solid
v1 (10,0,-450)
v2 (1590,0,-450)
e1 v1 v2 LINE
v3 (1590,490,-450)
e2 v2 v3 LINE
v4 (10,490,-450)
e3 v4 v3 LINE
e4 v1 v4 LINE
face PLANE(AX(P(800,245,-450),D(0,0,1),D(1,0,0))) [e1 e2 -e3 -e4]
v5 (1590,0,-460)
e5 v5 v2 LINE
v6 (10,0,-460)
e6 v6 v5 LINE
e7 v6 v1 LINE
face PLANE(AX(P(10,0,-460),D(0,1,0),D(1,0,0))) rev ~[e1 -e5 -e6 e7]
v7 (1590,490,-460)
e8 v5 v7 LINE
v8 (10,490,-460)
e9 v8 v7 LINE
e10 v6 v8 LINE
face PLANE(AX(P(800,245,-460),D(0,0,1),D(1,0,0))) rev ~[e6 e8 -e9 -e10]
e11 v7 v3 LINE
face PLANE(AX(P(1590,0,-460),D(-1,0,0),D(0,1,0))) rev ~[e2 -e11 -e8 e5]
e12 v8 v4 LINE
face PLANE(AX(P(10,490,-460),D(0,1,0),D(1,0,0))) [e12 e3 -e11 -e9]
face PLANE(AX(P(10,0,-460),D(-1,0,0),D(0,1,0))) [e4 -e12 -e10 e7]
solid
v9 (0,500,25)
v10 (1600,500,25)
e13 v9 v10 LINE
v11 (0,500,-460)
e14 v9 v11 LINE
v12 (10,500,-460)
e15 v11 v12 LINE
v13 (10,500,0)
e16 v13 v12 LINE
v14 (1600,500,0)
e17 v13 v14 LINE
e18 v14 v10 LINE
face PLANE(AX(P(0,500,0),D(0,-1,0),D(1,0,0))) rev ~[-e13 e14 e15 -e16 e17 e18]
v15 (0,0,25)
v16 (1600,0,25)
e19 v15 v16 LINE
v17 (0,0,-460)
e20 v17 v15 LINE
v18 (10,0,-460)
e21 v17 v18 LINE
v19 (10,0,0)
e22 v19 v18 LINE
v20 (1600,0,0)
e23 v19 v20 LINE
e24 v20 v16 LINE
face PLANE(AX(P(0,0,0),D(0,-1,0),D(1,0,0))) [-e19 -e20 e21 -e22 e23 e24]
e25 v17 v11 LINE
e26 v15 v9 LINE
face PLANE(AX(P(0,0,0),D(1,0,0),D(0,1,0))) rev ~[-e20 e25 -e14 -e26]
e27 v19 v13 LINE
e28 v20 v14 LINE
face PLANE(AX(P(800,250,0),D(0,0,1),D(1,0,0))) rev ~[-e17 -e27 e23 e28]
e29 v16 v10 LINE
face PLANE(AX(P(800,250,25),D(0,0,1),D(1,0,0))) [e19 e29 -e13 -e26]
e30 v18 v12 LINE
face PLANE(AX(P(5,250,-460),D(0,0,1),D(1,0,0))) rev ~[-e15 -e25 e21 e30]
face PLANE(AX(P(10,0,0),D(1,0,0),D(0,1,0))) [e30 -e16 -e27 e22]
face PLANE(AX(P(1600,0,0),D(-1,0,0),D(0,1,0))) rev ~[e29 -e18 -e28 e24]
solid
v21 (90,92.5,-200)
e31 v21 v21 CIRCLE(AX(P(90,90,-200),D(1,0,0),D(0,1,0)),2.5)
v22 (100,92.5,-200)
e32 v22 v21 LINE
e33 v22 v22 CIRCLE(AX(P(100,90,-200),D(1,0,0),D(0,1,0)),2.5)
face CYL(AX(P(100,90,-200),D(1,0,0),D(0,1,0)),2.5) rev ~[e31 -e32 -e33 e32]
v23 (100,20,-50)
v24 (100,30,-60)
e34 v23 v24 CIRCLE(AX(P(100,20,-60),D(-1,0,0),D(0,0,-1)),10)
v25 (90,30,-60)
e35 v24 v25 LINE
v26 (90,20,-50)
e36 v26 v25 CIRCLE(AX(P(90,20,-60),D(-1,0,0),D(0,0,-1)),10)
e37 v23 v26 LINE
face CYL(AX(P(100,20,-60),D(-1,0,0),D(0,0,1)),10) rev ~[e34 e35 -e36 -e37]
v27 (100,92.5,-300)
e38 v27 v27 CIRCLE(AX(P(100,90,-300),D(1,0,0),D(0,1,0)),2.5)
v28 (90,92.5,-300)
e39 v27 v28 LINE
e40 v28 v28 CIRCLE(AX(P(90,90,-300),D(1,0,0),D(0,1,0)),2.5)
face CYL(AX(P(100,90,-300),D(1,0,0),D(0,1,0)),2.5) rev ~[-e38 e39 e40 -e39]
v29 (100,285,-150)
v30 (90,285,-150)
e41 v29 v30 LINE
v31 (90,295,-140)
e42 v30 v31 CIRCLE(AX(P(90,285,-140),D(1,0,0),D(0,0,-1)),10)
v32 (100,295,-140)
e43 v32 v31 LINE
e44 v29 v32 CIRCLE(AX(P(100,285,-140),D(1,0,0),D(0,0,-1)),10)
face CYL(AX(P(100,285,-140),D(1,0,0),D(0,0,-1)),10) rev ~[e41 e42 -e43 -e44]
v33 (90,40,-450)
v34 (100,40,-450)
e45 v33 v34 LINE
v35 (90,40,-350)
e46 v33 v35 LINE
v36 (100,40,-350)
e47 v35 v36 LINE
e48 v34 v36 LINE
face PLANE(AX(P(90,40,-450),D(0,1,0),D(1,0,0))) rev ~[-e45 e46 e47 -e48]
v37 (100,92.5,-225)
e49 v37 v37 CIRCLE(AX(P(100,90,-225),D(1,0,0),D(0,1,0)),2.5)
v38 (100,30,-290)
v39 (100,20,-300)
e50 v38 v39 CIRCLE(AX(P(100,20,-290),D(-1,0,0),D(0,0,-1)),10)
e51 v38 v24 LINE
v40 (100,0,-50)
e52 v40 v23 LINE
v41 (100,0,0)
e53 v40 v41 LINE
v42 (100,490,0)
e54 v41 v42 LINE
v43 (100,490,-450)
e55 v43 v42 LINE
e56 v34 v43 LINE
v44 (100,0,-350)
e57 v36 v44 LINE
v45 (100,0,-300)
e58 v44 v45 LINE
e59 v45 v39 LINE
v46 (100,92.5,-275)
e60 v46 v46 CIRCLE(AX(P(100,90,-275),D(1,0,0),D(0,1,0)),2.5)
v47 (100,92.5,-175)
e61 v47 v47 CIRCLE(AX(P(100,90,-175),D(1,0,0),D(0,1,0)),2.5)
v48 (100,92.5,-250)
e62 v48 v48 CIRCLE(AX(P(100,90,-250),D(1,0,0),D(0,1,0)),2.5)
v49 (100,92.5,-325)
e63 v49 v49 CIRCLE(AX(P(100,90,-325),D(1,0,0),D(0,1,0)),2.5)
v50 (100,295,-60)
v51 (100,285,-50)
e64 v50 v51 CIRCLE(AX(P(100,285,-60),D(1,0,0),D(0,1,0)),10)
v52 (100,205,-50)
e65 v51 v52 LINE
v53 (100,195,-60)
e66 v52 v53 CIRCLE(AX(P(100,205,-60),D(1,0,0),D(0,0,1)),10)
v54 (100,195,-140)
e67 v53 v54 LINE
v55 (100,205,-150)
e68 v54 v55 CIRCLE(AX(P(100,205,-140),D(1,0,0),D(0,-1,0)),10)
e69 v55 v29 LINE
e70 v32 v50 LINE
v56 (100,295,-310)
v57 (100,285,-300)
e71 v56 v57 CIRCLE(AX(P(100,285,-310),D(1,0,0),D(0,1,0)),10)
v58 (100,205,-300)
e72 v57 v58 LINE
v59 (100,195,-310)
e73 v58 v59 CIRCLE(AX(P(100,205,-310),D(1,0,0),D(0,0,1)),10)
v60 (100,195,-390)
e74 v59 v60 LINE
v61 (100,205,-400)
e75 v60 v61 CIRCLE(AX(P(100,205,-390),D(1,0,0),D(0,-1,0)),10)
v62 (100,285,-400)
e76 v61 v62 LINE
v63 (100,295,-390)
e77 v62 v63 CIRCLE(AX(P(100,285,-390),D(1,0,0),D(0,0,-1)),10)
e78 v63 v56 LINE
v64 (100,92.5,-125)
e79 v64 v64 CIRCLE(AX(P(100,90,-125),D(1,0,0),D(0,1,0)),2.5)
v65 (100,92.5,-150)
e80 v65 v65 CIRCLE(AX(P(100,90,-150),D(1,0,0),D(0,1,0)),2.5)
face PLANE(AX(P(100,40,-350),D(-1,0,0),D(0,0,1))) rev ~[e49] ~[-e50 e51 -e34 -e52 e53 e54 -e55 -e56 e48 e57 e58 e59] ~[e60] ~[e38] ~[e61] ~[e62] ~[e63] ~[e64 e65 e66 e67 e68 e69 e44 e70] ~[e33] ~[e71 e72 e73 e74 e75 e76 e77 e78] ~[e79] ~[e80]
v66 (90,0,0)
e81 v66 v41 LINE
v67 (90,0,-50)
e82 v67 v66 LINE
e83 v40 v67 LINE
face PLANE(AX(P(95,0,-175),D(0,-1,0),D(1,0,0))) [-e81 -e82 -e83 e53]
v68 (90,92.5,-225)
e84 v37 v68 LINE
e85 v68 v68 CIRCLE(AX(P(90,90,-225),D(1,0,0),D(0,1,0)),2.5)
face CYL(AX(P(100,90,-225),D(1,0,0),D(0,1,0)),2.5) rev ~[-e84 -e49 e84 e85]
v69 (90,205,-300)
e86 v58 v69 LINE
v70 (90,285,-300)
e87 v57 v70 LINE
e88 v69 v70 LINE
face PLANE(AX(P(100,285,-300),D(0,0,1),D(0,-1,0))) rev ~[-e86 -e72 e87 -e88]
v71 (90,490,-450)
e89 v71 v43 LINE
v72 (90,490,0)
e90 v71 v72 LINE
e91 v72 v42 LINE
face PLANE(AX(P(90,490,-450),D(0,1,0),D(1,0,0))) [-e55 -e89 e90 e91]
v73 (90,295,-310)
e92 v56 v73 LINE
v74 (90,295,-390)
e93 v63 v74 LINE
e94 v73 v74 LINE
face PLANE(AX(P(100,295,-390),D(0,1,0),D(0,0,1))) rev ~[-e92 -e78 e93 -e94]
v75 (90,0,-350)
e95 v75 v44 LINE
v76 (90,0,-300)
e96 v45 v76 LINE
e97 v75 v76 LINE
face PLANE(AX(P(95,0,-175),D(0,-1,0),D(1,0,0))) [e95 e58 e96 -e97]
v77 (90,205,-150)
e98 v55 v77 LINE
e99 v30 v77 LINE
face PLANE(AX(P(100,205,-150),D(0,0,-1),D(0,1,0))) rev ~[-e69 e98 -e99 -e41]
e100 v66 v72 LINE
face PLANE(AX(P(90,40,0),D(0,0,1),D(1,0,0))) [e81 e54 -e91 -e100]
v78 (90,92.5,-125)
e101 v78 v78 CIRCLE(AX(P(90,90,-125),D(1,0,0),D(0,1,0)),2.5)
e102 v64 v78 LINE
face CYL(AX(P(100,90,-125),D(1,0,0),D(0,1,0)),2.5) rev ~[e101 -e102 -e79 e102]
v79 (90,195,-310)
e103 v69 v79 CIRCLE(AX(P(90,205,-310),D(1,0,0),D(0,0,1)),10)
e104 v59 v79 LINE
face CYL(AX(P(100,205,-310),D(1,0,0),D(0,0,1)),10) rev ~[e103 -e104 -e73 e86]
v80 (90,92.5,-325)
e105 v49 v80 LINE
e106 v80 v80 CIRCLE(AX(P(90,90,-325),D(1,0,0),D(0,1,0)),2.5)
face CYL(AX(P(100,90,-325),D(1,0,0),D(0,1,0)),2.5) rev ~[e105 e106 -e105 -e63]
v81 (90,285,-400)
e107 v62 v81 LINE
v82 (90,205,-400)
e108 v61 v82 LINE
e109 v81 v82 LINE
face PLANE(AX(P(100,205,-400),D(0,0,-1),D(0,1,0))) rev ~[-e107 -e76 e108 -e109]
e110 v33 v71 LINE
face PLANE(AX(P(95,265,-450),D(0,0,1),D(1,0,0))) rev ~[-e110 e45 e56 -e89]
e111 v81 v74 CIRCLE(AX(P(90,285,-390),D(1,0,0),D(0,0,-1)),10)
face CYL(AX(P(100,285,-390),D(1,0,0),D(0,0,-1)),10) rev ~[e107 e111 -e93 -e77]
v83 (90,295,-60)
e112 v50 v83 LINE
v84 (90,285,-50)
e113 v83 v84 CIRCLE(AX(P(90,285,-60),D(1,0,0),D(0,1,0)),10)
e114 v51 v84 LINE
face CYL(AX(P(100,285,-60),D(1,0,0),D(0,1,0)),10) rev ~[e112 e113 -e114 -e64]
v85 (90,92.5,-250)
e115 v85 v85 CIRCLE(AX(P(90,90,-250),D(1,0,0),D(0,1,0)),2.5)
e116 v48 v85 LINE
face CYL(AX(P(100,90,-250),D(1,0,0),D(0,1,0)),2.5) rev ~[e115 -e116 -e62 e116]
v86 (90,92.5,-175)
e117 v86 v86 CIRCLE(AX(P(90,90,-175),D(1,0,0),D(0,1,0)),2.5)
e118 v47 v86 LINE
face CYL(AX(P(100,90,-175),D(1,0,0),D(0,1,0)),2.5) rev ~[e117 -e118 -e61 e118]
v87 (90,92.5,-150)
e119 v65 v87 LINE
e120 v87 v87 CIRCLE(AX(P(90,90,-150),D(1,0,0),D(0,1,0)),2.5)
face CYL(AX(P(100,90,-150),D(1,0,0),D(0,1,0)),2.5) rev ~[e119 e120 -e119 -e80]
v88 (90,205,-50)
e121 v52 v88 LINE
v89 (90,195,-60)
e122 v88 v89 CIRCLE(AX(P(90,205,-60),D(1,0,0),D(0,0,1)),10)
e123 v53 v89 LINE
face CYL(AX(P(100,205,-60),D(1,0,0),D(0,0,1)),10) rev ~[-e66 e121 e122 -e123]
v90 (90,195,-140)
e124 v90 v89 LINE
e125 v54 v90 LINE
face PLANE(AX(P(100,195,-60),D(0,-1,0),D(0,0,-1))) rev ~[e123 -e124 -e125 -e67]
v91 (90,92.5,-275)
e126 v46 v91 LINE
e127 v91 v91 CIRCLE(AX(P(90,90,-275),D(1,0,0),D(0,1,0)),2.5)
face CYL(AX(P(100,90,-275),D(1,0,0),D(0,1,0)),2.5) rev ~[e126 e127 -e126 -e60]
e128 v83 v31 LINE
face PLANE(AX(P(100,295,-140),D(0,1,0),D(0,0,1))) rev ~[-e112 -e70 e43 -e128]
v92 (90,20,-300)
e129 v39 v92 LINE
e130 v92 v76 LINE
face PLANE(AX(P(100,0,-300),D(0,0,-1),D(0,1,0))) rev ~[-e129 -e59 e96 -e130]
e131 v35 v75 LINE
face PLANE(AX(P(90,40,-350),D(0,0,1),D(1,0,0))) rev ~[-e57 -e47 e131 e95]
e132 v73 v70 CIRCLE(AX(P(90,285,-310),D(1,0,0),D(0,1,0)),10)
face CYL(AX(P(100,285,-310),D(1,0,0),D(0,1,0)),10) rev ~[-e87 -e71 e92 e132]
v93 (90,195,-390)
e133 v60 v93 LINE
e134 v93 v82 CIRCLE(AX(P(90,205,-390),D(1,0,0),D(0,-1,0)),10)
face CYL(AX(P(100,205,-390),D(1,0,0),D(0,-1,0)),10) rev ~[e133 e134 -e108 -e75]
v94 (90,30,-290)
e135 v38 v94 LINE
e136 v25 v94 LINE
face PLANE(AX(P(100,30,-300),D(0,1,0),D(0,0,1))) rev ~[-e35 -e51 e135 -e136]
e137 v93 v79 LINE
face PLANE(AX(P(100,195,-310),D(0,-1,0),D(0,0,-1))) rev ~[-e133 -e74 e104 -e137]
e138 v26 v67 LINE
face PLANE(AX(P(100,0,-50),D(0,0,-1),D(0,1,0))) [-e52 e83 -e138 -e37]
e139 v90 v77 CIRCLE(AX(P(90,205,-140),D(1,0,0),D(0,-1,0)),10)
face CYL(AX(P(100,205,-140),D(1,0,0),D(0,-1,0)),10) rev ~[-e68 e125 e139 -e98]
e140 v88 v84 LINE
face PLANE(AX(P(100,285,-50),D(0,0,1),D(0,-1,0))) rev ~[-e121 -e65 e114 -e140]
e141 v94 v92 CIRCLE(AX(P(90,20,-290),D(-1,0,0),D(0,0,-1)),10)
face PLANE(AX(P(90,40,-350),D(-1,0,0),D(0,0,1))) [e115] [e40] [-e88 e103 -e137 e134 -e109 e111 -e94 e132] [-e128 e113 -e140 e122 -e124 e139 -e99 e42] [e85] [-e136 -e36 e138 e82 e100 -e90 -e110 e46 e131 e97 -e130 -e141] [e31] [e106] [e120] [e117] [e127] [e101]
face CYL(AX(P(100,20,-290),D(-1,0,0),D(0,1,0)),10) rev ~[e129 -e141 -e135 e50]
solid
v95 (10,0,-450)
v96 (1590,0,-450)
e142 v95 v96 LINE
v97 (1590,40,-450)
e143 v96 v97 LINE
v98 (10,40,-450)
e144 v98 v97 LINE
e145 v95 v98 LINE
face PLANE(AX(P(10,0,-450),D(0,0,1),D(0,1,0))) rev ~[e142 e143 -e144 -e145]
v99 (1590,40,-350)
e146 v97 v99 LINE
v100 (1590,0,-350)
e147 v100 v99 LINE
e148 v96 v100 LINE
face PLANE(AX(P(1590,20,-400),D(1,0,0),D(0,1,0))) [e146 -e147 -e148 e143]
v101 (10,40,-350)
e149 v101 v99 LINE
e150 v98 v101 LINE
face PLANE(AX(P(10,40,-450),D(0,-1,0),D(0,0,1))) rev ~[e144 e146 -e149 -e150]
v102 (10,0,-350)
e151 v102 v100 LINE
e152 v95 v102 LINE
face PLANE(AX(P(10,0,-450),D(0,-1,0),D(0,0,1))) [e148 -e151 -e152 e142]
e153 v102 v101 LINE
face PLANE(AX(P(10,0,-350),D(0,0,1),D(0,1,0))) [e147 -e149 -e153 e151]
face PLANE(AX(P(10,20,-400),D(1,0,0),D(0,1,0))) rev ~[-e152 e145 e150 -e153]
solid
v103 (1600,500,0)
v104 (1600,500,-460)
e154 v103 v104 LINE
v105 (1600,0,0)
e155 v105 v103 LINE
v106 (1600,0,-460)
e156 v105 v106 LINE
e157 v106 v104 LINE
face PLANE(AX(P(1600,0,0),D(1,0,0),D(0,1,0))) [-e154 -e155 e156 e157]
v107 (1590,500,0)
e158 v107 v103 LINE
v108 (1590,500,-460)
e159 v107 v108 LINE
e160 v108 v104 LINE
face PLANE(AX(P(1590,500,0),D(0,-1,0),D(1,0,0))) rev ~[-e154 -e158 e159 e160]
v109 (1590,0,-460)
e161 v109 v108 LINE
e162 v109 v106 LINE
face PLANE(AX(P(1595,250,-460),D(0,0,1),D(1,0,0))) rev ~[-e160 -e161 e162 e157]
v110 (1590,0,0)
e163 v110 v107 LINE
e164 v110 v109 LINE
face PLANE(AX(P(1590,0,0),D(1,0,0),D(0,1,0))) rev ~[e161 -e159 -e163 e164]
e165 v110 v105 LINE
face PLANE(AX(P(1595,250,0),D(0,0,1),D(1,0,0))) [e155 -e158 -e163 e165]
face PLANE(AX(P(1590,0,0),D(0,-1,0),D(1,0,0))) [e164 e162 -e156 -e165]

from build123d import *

# Parameters (mm, degrees)
F0_W      = 1600
F0_H      = 500
F1_DEPTH  = 25
F3_W      = 1580
F3_H      = 490
F4_DEPTH  = 10
F5_W      = 10
F5_H      = 500
F6_DEPTH  = 460
F7_W      = 10
F7_H      = 500
F8_DEPTH  = 460
F9_W      = 40
F9_H      = 100
F10_DEPTH = 1580
F11_W     = 10
F11_H     = 450
F12_DEPTH = 450
F13_W     = 10
F13_H     = 350
F14_DEPTH = 40
F16_W     = 30
F16_H     = 250
F17_DEPTH = 100.001
F18_R     = 10
F20_DEPTH = 100.001
F21_R     = 2.5
F22_DEPTH = 100.001


with BuildPart() as f1:
    # F0 (on Top) → F1 (new body)
    with BuildSketch(Plane.XY):
        with Locations((800, 250)):
            Rectangle(F0_W, F0_H)
    extrude(amount=F1_DEPTH)

    # F5 (on face) → F6 (join, through all)
    with BuildSketch(Plane.XY):
        with Locations((5, 250)):
            Rectangle(F5_W, F5_H)
    extrude(amount=-F6_DEPTH)


with BuildPart() as f4:
    # F3 (on offset) → F4 (new body)
    with BuildSketch(Plane.XY.offset(-460)):
        with Locations((800, 245)):
            Rectangle(F3_W, F3_H)
    extrude(amount=F4_DEPTH)


with BuildPart() as f8:
    # F7 (on face) → F8 (new body, through all)
    with BuildSketch(Plane.XY):
        with Locations((1595, 250)):
            Rectangle(F7_W, F7_H)
    extrude(amount=-F8_DEPTH)


with BuildPart() as f10:
    # F9 (on face) → F10 (new body, through all)
    with BuildSketch(Plane.YZ.offset(10)):
        with Locations((20, -400)):
            Rectangle(F9_W, F9_H)
    extrude(amount=F10_DEPTH)


with BuildPart() as f12:
    # F11 (on face) → F12 (new body, through all)
    with BuildSketch(Plane.XY.offset(-450)):
        with Locations((95, 265)):
            Rectangle(F11_W, F11_H)
    extrude(amount=F12_DEPTH)

    # F13 (on face) → F14 (join, through all)
    with BuildSketch(Plane.XZ.offset(-40)):
        with Locations((95, -175)):
            Rectangle(F13_W, F13_H)
    extrude(amount=F14_DEPTH)

    # F15: union 

    # F16 (on face) → F17 (cut, through all)
    with BuildSketch(Plane.YZ.offset(100)):
        with Locations((15, -175)):
            Rectangle(F16_W, F16_H)
    extrude(amount=-F17_DEPTH, mode=Mode.SUBTRACT)

    # F18
    f18_edges = [f12.edges().sort_by_distance(p)[0] for p in [
        (95, 30, -50),
        (95, 30, -300),
    ]]
    fillet(f18_edges, radius=F18_R)

    # F19 (on face) → F20 (cut, through all)
    with BuildSketch(Plane.YZ.offset(100)):
        with BuildLine():
            Line((285, -50), (205, -50))
            ThreePointArc((205, -50), (197.9289321881, -52.9289321881), (195, -60))
            Line((195, -60), (195, -140))
            ThreePointArc((195, -140), (197.9289321881, -147.0710678119), (205, -150))
            Line((205, -150), (285, -150))
            ThreePointArc((285, -150), (292.0710678119, -147.0710678119), (295, -140))
            Line((295, -140), (295, -60))
            ThreePointArc((295, -60), (292.0710678119, -52.9289321881), (285, -50))
        make_face()
        with BuildLine():
            Line((285, -300), (205, -300))
            ThreePointArc((205, -300), (197.9289321881, -302.9289321881), (195, -310))
            Line((195, -310), (195, -390))
            ThreePointArc((195, -390), (197.9289321881, -397.0710678119), (205, -400))
            Line((205, -400), (285, -400))
            ThreePointArc((285, -400), (292.0710678119, -397.0710678119), (295, -390))
            Line((295, -390), (295, -310))
            ThreePointArc((295, -310), (292.0710678119, -302.9289321881), (285, -300))
        make_face()
    extrude(amount=-F20_DEPTH, mode=Mode.SUBTRACT)

    # F21 (on face) → F22 (cut, through all)
    with BuildSketch(Plane.YZ.offset(100)):
        with Locations((90, -325)):
            Circle(F21_R)
        with Locations((90, -300)):
            Circle(F21_R)
        with Locations((90, -275)):
            Circle(F21_R)
        with Locations((90, -250)):
            Circle(F21_R)
        with Locations((90, -225)):
            Circle(F21_R)
        with Locations((90, -200)):
            Circle(F21_R)
        with Locations((90, -175)):
            Circle(F21_R)
        with Locations((90, -150)):
            Circle(F21_R)
        with Locations((90, -125)):
            Circle(F21_R)
    extrude(amount=-F22_DEPTH, mode=Mode.SUBTRACT)


solid = Compound([f1.part, f4.part, f8.part, f10.part, f12.part])
